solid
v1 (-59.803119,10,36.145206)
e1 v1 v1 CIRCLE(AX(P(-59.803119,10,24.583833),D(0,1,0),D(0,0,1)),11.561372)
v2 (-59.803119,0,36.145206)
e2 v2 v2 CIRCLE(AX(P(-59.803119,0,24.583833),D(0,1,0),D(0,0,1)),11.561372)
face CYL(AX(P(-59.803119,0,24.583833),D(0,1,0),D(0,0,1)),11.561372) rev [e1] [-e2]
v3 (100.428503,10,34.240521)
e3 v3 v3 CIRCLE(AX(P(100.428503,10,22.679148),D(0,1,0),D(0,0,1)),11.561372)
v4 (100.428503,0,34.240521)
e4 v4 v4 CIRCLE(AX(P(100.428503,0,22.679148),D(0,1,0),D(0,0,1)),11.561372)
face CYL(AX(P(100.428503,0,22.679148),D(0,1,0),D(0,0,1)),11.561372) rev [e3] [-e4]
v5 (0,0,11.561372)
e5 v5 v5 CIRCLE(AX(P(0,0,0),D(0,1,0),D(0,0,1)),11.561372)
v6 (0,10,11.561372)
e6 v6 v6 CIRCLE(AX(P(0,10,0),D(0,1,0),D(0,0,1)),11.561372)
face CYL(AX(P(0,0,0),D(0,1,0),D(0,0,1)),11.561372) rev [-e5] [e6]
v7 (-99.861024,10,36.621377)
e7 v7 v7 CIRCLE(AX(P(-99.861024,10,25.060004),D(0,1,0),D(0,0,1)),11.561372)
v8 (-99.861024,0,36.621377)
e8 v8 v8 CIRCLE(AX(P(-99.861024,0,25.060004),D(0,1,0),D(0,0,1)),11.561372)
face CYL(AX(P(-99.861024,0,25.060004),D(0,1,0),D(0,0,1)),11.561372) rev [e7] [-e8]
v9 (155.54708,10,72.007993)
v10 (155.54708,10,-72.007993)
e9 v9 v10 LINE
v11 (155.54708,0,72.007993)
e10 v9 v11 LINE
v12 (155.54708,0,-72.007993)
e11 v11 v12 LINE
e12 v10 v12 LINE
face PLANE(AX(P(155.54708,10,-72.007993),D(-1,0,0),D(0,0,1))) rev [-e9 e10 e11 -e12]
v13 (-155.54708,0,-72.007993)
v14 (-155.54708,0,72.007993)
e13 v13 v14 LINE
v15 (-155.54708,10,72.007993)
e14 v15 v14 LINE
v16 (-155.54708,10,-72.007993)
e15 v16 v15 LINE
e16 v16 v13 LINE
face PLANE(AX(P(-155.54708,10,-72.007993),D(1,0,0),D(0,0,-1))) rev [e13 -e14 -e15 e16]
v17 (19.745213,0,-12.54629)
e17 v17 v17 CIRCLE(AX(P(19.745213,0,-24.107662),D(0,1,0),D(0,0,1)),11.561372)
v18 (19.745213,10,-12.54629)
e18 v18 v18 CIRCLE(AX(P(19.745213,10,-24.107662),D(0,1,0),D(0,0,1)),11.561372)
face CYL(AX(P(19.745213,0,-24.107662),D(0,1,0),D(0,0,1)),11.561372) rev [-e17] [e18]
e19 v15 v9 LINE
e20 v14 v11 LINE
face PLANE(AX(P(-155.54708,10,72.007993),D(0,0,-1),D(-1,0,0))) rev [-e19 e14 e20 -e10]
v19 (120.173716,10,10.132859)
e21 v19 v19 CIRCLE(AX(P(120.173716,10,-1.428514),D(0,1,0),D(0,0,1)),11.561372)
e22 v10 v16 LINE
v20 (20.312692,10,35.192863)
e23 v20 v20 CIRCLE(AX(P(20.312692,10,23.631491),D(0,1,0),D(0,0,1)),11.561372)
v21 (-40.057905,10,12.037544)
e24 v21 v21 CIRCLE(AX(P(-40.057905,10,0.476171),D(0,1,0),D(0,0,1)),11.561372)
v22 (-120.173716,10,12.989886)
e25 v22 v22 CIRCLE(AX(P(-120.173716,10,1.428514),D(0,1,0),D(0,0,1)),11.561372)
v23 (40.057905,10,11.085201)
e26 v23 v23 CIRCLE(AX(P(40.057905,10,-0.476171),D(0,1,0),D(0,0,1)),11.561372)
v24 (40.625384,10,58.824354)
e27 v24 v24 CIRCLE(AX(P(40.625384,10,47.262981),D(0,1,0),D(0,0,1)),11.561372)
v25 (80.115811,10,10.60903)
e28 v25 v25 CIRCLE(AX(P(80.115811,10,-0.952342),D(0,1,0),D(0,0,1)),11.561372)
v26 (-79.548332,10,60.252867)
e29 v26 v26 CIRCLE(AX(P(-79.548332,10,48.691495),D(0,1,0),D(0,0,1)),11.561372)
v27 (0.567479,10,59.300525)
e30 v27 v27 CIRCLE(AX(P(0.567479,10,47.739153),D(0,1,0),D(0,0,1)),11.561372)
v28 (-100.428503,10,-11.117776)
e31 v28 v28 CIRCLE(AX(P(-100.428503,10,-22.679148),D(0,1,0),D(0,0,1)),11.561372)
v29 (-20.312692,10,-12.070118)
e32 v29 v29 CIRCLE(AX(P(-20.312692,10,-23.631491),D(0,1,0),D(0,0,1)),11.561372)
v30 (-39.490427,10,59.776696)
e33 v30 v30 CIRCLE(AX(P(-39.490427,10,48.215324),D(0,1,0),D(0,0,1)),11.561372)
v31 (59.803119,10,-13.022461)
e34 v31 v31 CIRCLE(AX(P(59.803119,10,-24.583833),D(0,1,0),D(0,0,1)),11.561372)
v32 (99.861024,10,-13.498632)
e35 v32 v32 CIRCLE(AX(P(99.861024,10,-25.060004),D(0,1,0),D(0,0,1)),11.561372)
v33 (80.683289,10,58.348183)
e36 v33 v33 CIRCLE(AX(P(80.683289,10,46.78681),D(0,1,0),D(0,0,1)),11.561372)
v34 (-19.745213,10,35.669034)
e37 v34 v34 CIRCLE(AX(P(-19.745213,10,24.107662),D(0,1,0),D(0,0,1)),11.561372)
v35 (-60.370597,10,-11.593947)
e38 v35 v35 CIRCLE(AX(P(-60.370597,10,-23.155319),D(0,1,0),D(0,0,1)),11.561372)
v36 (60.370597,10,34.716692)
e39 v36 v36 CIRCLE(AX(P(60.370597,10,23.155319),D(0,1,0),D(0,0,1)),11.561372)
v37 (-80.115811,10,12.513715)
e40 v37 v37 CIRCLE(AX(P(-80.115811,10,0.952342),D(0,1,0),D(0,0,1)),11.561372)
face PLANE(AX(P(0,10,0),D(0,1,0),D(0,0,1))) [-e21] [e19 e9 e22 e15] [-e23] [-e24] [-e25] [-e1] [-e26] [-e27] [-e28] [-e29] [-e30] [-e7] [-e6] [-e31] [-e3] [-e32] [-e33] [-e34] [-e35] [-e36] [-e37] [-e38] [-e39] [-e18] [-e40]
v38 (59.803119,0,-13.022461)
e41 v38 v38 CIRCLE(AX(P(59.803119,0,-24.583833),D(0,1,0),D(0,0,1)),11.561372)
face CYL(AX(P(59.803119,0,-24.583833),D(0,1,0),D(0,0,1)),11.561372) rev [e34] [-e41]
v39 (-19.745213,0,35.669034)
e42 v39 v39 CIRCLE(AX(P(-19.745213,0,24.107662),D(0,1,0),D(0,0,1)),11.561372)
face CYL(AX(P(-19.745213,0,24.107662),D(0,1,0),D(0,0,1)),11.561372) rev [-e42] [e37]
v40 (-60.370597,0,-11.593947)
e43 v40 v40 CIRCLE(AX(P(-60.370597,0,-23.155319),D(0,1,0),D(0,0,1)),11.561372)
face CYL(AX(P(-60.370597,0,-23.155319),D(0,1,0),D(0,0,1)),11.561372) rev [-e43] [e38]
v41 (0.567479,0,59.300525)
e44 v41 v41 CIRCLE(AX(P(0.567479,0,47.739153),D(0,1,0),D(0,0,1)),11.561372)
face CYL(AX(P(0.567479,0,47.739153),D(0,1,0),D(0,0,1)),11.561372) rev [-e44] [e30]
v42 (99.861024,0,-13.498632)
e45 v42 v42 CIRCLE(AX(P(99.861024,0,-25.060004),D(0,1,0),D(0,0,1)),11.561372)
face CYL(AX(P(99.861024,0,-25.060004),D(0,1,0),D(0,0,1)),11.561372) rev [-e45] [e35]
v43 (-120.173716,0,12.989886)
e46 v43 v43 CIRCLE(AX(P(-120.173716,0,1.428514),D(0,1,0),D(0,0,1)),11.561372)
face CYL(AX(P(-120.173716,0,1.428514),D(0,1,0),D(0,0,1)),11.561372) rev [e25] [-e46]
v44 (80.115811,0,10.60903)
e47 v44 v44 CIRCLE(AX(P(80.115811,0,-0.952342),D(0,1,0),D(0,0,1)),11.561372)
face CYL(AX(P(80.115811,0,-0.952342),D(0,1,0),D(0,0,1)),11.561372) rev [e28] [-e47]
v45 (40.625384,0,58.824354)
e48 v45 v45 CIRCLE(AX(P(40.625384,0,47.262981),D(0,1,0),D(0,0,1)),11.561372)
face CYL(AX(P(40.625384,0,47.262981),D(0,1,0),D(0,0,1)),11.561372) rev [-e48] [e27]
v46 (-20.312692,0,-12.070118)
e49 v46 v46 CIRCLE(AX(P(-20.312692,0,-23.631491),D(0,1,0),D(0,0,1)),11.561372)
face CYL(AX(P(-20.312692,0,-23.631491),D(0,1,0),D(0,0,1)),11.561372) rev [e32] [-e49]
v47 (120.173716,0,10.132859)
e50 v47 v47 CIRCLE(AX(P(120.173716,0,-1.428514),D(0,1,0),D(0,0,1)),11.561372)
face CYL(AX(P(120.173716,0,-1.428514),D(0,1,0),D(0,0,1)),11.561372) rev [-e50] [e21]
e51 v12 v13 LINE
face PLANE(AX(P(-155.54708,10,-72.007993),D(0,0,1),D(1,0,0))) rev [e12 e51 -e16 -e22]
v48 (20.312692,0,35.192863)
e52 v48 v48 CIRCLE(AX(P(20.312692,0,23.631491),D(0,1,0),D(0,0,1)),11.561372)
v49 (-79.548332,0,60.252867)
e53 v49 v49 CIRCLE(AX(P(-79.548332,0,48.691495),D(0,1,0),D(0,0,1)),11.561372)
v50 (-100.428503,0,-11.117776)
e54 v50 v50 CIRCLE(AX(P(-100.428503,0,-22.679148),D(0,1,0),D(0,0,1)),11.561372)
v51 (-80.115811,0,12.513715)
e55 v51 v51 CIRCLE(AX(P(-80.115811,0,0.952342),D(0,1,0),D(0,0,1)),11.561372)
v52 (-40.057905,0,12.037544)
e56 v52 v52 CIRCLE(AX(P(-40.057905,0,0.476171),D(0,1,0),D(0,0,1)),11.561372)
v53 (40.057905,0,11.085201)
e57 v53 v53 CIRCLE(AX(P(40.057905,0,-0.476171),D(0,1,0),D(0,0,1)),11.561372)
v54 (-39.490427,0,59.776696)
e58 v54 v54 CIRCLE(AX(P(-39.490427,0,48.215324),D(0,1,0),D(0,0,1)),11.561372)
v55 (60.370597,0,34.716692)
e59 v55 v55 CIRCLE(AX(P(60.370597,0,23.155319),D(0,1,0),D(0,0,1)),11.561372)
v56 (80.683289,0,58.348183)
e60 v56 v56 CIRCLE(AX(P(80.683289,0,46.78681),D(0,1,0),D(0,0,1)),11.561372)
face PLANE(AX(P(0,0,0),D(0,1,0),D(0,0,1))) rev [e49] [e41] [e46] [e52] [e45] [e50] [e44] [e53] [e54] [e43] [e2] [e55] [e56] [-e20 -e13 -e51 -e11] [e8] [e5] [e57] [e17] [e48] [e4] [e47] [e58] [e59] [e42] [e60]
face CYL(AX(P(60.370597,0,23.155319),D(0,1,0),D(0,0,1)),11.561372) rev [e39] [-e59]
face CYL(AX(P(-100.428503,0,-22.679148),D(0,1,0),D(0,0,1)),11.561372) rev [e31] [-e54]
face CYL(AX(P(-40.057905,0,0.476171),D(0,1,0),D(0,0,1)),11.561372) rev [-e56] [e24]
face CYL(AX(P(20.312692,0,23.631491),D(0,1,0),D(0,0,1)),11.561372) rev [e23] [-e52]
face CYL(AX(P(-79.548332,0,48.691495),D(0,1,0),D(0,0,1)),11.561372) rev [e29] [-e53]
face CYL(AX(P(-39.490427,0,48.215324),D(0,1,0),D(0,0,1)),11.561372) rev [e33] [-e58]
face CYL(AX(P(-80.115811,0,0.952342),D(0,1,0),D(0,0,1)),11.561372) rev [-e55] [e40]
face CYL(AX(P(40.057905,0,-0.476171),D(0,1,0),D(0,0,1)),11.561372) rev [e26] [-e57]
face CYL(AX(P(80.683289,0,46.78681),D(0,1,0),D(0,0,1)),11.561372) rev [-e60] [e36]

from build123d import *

# Parameters (mm, degrees)
SKETCH1_W               = 311.094159216
SKETCH1_H               = 144.015986956
BOSS_EXTRUDE1_DEPTH     = 10
SKETCH2_R               = 11.561372413
CUT_EXTRUDE1_DEPTH      = 10
FILL_PATTERN1_OUTLINE_R = 11.561372413
FILL_PATTERN1_DEPTH     = 10


# Read off the part's stored shape, not the designer's step: Fill Pattern1
with BuildPart() as part:
    # Sketch1 → Boss-Extrude1 (new body)
    with BuildSketch(Plane(origin=(0, 0, 0), x_dir=(1, 0, 0), z_dir=(0, 1, 0))):
        Rectangle(SKETCH1_W, SKETCH1_H)
    extrude(amount=BOSS_EXTRUDE1_DEPTH)

    # Sketch2 → Cut-Extrude1 (cut)
    with BuildSketch(Plane(origin=(0, 10, 0), x_dir=(1, 0, 0), z_dir=(0, 1, 0))):
        with Locations(Location((0, 0, 0), (0, 0, 270))):
            Circle(SKETCH2_R)
    extrude(amount=-CUT_EXTRUDE1_DEPTH, mode=Mode.SUBTRACT)

    # Fill Pattern1 outline → Fill Pattern1 (cut)
    with BuildSketch(Plane(origin=(0, 0, 0), x_dir=(1, 0, 0), z_dir=(0, 1, 0))):
        with Locations((-120.173715992, -1.428513712)):
            Circle(FILL_PATTERN1_OUTLINE_R)
        with Locations((80.683289444, -46.786810115)):
            Circle(FILL_PATTERN1_OUTLINE_R)
        with Locations((99.861023935, 25.060004388)):
            Circle(FILL_PATTERN1_OUTLINE_R)
        with Locations((80.115810661, 0.952342474)):
            Circle(FILL_PATTERN1_OUTLINE_R)
        with Locations((60.370597387, -23.155319439)):
            Circle(FILL_PATTERN1_OUTLINE_R)
        with Locations((100.428502718, -22.679148202)):
            Circle(FILL_PATTERN1_OUTLINE_R)
        with Locations((120.173715992, 1.428513712)):
            Circle(FILL_PATTERN1_OUTLINE_R)
        with Locations((-20.312692057, 23.631490676)):
            Circle(FILL_PATTERN1_OUTLINE_R)
        with Locations((-40.057905331, -0.476171237)):
            Circle(FILL_PATTERN1_OUTLINE_R)
        with Locations((-59.803118605, -24.583833151)):
            Circle(FILL_PATTERN1_OUTLINE_R)
        with Locations((-79.548331879, -48.691495064)):
            Circle(FILL_PATTERN1_OUTLINE_R)
        with Locations((-100.428502718, 22.679148202)):
            Circle(FILL_PATTERN1_OUTLINE_R)
        with Locations((-99.861023935, -25.060004388)):
            Circle(FILL_PATTERN1_OUTLINE_R)
        with Locations((-80.115810661, -0.952342474)):
            Circle(FILL_PATTERN1_OUTLINE_R)
        with Locations((-60.370597387, 23.155319439)):
            Circle(FILL_PATTERN1_OUTLINE_R)
        with Locations((20.312692057, -23.631490676)):
            Circle(FILL_PATTERN1_OUTLINE_R)
        with Locations((40.057905331, 0.476171237)):
            Circle(FILL_PATTERN1_OUTLINE_R)
        with Locations((59.803118605, 24.583833151)):
            Circle(FILL_PATTERN1_OUTLINE_R)
        with Locations((40.625384113, -47.262981352)):
            Circle(FILL_PATTERN1_OUTLINE_R)
        with Locations((-39.490426548, -48.215323827)):
            Circle(FILL_PATTERN1_OUTLINE_R)
        with Locations((-19.745213274, -24.107661913)):
            Circle(FILL_PATTERN1_OUTLINE_R)
        with Locations((19.745213274, 24.107661913)):
            Circle(FILL_PATTERN1_OUTLINE_R)
        with Locations((0.567478783, -47.73915259)):
            Circle(FILL_PATTERN1_OUTLINE_R)
    extrude(amount=FILL_PATTERN1_DEPTH, mode=Mode.SUBTRACT)


solid = part.part
